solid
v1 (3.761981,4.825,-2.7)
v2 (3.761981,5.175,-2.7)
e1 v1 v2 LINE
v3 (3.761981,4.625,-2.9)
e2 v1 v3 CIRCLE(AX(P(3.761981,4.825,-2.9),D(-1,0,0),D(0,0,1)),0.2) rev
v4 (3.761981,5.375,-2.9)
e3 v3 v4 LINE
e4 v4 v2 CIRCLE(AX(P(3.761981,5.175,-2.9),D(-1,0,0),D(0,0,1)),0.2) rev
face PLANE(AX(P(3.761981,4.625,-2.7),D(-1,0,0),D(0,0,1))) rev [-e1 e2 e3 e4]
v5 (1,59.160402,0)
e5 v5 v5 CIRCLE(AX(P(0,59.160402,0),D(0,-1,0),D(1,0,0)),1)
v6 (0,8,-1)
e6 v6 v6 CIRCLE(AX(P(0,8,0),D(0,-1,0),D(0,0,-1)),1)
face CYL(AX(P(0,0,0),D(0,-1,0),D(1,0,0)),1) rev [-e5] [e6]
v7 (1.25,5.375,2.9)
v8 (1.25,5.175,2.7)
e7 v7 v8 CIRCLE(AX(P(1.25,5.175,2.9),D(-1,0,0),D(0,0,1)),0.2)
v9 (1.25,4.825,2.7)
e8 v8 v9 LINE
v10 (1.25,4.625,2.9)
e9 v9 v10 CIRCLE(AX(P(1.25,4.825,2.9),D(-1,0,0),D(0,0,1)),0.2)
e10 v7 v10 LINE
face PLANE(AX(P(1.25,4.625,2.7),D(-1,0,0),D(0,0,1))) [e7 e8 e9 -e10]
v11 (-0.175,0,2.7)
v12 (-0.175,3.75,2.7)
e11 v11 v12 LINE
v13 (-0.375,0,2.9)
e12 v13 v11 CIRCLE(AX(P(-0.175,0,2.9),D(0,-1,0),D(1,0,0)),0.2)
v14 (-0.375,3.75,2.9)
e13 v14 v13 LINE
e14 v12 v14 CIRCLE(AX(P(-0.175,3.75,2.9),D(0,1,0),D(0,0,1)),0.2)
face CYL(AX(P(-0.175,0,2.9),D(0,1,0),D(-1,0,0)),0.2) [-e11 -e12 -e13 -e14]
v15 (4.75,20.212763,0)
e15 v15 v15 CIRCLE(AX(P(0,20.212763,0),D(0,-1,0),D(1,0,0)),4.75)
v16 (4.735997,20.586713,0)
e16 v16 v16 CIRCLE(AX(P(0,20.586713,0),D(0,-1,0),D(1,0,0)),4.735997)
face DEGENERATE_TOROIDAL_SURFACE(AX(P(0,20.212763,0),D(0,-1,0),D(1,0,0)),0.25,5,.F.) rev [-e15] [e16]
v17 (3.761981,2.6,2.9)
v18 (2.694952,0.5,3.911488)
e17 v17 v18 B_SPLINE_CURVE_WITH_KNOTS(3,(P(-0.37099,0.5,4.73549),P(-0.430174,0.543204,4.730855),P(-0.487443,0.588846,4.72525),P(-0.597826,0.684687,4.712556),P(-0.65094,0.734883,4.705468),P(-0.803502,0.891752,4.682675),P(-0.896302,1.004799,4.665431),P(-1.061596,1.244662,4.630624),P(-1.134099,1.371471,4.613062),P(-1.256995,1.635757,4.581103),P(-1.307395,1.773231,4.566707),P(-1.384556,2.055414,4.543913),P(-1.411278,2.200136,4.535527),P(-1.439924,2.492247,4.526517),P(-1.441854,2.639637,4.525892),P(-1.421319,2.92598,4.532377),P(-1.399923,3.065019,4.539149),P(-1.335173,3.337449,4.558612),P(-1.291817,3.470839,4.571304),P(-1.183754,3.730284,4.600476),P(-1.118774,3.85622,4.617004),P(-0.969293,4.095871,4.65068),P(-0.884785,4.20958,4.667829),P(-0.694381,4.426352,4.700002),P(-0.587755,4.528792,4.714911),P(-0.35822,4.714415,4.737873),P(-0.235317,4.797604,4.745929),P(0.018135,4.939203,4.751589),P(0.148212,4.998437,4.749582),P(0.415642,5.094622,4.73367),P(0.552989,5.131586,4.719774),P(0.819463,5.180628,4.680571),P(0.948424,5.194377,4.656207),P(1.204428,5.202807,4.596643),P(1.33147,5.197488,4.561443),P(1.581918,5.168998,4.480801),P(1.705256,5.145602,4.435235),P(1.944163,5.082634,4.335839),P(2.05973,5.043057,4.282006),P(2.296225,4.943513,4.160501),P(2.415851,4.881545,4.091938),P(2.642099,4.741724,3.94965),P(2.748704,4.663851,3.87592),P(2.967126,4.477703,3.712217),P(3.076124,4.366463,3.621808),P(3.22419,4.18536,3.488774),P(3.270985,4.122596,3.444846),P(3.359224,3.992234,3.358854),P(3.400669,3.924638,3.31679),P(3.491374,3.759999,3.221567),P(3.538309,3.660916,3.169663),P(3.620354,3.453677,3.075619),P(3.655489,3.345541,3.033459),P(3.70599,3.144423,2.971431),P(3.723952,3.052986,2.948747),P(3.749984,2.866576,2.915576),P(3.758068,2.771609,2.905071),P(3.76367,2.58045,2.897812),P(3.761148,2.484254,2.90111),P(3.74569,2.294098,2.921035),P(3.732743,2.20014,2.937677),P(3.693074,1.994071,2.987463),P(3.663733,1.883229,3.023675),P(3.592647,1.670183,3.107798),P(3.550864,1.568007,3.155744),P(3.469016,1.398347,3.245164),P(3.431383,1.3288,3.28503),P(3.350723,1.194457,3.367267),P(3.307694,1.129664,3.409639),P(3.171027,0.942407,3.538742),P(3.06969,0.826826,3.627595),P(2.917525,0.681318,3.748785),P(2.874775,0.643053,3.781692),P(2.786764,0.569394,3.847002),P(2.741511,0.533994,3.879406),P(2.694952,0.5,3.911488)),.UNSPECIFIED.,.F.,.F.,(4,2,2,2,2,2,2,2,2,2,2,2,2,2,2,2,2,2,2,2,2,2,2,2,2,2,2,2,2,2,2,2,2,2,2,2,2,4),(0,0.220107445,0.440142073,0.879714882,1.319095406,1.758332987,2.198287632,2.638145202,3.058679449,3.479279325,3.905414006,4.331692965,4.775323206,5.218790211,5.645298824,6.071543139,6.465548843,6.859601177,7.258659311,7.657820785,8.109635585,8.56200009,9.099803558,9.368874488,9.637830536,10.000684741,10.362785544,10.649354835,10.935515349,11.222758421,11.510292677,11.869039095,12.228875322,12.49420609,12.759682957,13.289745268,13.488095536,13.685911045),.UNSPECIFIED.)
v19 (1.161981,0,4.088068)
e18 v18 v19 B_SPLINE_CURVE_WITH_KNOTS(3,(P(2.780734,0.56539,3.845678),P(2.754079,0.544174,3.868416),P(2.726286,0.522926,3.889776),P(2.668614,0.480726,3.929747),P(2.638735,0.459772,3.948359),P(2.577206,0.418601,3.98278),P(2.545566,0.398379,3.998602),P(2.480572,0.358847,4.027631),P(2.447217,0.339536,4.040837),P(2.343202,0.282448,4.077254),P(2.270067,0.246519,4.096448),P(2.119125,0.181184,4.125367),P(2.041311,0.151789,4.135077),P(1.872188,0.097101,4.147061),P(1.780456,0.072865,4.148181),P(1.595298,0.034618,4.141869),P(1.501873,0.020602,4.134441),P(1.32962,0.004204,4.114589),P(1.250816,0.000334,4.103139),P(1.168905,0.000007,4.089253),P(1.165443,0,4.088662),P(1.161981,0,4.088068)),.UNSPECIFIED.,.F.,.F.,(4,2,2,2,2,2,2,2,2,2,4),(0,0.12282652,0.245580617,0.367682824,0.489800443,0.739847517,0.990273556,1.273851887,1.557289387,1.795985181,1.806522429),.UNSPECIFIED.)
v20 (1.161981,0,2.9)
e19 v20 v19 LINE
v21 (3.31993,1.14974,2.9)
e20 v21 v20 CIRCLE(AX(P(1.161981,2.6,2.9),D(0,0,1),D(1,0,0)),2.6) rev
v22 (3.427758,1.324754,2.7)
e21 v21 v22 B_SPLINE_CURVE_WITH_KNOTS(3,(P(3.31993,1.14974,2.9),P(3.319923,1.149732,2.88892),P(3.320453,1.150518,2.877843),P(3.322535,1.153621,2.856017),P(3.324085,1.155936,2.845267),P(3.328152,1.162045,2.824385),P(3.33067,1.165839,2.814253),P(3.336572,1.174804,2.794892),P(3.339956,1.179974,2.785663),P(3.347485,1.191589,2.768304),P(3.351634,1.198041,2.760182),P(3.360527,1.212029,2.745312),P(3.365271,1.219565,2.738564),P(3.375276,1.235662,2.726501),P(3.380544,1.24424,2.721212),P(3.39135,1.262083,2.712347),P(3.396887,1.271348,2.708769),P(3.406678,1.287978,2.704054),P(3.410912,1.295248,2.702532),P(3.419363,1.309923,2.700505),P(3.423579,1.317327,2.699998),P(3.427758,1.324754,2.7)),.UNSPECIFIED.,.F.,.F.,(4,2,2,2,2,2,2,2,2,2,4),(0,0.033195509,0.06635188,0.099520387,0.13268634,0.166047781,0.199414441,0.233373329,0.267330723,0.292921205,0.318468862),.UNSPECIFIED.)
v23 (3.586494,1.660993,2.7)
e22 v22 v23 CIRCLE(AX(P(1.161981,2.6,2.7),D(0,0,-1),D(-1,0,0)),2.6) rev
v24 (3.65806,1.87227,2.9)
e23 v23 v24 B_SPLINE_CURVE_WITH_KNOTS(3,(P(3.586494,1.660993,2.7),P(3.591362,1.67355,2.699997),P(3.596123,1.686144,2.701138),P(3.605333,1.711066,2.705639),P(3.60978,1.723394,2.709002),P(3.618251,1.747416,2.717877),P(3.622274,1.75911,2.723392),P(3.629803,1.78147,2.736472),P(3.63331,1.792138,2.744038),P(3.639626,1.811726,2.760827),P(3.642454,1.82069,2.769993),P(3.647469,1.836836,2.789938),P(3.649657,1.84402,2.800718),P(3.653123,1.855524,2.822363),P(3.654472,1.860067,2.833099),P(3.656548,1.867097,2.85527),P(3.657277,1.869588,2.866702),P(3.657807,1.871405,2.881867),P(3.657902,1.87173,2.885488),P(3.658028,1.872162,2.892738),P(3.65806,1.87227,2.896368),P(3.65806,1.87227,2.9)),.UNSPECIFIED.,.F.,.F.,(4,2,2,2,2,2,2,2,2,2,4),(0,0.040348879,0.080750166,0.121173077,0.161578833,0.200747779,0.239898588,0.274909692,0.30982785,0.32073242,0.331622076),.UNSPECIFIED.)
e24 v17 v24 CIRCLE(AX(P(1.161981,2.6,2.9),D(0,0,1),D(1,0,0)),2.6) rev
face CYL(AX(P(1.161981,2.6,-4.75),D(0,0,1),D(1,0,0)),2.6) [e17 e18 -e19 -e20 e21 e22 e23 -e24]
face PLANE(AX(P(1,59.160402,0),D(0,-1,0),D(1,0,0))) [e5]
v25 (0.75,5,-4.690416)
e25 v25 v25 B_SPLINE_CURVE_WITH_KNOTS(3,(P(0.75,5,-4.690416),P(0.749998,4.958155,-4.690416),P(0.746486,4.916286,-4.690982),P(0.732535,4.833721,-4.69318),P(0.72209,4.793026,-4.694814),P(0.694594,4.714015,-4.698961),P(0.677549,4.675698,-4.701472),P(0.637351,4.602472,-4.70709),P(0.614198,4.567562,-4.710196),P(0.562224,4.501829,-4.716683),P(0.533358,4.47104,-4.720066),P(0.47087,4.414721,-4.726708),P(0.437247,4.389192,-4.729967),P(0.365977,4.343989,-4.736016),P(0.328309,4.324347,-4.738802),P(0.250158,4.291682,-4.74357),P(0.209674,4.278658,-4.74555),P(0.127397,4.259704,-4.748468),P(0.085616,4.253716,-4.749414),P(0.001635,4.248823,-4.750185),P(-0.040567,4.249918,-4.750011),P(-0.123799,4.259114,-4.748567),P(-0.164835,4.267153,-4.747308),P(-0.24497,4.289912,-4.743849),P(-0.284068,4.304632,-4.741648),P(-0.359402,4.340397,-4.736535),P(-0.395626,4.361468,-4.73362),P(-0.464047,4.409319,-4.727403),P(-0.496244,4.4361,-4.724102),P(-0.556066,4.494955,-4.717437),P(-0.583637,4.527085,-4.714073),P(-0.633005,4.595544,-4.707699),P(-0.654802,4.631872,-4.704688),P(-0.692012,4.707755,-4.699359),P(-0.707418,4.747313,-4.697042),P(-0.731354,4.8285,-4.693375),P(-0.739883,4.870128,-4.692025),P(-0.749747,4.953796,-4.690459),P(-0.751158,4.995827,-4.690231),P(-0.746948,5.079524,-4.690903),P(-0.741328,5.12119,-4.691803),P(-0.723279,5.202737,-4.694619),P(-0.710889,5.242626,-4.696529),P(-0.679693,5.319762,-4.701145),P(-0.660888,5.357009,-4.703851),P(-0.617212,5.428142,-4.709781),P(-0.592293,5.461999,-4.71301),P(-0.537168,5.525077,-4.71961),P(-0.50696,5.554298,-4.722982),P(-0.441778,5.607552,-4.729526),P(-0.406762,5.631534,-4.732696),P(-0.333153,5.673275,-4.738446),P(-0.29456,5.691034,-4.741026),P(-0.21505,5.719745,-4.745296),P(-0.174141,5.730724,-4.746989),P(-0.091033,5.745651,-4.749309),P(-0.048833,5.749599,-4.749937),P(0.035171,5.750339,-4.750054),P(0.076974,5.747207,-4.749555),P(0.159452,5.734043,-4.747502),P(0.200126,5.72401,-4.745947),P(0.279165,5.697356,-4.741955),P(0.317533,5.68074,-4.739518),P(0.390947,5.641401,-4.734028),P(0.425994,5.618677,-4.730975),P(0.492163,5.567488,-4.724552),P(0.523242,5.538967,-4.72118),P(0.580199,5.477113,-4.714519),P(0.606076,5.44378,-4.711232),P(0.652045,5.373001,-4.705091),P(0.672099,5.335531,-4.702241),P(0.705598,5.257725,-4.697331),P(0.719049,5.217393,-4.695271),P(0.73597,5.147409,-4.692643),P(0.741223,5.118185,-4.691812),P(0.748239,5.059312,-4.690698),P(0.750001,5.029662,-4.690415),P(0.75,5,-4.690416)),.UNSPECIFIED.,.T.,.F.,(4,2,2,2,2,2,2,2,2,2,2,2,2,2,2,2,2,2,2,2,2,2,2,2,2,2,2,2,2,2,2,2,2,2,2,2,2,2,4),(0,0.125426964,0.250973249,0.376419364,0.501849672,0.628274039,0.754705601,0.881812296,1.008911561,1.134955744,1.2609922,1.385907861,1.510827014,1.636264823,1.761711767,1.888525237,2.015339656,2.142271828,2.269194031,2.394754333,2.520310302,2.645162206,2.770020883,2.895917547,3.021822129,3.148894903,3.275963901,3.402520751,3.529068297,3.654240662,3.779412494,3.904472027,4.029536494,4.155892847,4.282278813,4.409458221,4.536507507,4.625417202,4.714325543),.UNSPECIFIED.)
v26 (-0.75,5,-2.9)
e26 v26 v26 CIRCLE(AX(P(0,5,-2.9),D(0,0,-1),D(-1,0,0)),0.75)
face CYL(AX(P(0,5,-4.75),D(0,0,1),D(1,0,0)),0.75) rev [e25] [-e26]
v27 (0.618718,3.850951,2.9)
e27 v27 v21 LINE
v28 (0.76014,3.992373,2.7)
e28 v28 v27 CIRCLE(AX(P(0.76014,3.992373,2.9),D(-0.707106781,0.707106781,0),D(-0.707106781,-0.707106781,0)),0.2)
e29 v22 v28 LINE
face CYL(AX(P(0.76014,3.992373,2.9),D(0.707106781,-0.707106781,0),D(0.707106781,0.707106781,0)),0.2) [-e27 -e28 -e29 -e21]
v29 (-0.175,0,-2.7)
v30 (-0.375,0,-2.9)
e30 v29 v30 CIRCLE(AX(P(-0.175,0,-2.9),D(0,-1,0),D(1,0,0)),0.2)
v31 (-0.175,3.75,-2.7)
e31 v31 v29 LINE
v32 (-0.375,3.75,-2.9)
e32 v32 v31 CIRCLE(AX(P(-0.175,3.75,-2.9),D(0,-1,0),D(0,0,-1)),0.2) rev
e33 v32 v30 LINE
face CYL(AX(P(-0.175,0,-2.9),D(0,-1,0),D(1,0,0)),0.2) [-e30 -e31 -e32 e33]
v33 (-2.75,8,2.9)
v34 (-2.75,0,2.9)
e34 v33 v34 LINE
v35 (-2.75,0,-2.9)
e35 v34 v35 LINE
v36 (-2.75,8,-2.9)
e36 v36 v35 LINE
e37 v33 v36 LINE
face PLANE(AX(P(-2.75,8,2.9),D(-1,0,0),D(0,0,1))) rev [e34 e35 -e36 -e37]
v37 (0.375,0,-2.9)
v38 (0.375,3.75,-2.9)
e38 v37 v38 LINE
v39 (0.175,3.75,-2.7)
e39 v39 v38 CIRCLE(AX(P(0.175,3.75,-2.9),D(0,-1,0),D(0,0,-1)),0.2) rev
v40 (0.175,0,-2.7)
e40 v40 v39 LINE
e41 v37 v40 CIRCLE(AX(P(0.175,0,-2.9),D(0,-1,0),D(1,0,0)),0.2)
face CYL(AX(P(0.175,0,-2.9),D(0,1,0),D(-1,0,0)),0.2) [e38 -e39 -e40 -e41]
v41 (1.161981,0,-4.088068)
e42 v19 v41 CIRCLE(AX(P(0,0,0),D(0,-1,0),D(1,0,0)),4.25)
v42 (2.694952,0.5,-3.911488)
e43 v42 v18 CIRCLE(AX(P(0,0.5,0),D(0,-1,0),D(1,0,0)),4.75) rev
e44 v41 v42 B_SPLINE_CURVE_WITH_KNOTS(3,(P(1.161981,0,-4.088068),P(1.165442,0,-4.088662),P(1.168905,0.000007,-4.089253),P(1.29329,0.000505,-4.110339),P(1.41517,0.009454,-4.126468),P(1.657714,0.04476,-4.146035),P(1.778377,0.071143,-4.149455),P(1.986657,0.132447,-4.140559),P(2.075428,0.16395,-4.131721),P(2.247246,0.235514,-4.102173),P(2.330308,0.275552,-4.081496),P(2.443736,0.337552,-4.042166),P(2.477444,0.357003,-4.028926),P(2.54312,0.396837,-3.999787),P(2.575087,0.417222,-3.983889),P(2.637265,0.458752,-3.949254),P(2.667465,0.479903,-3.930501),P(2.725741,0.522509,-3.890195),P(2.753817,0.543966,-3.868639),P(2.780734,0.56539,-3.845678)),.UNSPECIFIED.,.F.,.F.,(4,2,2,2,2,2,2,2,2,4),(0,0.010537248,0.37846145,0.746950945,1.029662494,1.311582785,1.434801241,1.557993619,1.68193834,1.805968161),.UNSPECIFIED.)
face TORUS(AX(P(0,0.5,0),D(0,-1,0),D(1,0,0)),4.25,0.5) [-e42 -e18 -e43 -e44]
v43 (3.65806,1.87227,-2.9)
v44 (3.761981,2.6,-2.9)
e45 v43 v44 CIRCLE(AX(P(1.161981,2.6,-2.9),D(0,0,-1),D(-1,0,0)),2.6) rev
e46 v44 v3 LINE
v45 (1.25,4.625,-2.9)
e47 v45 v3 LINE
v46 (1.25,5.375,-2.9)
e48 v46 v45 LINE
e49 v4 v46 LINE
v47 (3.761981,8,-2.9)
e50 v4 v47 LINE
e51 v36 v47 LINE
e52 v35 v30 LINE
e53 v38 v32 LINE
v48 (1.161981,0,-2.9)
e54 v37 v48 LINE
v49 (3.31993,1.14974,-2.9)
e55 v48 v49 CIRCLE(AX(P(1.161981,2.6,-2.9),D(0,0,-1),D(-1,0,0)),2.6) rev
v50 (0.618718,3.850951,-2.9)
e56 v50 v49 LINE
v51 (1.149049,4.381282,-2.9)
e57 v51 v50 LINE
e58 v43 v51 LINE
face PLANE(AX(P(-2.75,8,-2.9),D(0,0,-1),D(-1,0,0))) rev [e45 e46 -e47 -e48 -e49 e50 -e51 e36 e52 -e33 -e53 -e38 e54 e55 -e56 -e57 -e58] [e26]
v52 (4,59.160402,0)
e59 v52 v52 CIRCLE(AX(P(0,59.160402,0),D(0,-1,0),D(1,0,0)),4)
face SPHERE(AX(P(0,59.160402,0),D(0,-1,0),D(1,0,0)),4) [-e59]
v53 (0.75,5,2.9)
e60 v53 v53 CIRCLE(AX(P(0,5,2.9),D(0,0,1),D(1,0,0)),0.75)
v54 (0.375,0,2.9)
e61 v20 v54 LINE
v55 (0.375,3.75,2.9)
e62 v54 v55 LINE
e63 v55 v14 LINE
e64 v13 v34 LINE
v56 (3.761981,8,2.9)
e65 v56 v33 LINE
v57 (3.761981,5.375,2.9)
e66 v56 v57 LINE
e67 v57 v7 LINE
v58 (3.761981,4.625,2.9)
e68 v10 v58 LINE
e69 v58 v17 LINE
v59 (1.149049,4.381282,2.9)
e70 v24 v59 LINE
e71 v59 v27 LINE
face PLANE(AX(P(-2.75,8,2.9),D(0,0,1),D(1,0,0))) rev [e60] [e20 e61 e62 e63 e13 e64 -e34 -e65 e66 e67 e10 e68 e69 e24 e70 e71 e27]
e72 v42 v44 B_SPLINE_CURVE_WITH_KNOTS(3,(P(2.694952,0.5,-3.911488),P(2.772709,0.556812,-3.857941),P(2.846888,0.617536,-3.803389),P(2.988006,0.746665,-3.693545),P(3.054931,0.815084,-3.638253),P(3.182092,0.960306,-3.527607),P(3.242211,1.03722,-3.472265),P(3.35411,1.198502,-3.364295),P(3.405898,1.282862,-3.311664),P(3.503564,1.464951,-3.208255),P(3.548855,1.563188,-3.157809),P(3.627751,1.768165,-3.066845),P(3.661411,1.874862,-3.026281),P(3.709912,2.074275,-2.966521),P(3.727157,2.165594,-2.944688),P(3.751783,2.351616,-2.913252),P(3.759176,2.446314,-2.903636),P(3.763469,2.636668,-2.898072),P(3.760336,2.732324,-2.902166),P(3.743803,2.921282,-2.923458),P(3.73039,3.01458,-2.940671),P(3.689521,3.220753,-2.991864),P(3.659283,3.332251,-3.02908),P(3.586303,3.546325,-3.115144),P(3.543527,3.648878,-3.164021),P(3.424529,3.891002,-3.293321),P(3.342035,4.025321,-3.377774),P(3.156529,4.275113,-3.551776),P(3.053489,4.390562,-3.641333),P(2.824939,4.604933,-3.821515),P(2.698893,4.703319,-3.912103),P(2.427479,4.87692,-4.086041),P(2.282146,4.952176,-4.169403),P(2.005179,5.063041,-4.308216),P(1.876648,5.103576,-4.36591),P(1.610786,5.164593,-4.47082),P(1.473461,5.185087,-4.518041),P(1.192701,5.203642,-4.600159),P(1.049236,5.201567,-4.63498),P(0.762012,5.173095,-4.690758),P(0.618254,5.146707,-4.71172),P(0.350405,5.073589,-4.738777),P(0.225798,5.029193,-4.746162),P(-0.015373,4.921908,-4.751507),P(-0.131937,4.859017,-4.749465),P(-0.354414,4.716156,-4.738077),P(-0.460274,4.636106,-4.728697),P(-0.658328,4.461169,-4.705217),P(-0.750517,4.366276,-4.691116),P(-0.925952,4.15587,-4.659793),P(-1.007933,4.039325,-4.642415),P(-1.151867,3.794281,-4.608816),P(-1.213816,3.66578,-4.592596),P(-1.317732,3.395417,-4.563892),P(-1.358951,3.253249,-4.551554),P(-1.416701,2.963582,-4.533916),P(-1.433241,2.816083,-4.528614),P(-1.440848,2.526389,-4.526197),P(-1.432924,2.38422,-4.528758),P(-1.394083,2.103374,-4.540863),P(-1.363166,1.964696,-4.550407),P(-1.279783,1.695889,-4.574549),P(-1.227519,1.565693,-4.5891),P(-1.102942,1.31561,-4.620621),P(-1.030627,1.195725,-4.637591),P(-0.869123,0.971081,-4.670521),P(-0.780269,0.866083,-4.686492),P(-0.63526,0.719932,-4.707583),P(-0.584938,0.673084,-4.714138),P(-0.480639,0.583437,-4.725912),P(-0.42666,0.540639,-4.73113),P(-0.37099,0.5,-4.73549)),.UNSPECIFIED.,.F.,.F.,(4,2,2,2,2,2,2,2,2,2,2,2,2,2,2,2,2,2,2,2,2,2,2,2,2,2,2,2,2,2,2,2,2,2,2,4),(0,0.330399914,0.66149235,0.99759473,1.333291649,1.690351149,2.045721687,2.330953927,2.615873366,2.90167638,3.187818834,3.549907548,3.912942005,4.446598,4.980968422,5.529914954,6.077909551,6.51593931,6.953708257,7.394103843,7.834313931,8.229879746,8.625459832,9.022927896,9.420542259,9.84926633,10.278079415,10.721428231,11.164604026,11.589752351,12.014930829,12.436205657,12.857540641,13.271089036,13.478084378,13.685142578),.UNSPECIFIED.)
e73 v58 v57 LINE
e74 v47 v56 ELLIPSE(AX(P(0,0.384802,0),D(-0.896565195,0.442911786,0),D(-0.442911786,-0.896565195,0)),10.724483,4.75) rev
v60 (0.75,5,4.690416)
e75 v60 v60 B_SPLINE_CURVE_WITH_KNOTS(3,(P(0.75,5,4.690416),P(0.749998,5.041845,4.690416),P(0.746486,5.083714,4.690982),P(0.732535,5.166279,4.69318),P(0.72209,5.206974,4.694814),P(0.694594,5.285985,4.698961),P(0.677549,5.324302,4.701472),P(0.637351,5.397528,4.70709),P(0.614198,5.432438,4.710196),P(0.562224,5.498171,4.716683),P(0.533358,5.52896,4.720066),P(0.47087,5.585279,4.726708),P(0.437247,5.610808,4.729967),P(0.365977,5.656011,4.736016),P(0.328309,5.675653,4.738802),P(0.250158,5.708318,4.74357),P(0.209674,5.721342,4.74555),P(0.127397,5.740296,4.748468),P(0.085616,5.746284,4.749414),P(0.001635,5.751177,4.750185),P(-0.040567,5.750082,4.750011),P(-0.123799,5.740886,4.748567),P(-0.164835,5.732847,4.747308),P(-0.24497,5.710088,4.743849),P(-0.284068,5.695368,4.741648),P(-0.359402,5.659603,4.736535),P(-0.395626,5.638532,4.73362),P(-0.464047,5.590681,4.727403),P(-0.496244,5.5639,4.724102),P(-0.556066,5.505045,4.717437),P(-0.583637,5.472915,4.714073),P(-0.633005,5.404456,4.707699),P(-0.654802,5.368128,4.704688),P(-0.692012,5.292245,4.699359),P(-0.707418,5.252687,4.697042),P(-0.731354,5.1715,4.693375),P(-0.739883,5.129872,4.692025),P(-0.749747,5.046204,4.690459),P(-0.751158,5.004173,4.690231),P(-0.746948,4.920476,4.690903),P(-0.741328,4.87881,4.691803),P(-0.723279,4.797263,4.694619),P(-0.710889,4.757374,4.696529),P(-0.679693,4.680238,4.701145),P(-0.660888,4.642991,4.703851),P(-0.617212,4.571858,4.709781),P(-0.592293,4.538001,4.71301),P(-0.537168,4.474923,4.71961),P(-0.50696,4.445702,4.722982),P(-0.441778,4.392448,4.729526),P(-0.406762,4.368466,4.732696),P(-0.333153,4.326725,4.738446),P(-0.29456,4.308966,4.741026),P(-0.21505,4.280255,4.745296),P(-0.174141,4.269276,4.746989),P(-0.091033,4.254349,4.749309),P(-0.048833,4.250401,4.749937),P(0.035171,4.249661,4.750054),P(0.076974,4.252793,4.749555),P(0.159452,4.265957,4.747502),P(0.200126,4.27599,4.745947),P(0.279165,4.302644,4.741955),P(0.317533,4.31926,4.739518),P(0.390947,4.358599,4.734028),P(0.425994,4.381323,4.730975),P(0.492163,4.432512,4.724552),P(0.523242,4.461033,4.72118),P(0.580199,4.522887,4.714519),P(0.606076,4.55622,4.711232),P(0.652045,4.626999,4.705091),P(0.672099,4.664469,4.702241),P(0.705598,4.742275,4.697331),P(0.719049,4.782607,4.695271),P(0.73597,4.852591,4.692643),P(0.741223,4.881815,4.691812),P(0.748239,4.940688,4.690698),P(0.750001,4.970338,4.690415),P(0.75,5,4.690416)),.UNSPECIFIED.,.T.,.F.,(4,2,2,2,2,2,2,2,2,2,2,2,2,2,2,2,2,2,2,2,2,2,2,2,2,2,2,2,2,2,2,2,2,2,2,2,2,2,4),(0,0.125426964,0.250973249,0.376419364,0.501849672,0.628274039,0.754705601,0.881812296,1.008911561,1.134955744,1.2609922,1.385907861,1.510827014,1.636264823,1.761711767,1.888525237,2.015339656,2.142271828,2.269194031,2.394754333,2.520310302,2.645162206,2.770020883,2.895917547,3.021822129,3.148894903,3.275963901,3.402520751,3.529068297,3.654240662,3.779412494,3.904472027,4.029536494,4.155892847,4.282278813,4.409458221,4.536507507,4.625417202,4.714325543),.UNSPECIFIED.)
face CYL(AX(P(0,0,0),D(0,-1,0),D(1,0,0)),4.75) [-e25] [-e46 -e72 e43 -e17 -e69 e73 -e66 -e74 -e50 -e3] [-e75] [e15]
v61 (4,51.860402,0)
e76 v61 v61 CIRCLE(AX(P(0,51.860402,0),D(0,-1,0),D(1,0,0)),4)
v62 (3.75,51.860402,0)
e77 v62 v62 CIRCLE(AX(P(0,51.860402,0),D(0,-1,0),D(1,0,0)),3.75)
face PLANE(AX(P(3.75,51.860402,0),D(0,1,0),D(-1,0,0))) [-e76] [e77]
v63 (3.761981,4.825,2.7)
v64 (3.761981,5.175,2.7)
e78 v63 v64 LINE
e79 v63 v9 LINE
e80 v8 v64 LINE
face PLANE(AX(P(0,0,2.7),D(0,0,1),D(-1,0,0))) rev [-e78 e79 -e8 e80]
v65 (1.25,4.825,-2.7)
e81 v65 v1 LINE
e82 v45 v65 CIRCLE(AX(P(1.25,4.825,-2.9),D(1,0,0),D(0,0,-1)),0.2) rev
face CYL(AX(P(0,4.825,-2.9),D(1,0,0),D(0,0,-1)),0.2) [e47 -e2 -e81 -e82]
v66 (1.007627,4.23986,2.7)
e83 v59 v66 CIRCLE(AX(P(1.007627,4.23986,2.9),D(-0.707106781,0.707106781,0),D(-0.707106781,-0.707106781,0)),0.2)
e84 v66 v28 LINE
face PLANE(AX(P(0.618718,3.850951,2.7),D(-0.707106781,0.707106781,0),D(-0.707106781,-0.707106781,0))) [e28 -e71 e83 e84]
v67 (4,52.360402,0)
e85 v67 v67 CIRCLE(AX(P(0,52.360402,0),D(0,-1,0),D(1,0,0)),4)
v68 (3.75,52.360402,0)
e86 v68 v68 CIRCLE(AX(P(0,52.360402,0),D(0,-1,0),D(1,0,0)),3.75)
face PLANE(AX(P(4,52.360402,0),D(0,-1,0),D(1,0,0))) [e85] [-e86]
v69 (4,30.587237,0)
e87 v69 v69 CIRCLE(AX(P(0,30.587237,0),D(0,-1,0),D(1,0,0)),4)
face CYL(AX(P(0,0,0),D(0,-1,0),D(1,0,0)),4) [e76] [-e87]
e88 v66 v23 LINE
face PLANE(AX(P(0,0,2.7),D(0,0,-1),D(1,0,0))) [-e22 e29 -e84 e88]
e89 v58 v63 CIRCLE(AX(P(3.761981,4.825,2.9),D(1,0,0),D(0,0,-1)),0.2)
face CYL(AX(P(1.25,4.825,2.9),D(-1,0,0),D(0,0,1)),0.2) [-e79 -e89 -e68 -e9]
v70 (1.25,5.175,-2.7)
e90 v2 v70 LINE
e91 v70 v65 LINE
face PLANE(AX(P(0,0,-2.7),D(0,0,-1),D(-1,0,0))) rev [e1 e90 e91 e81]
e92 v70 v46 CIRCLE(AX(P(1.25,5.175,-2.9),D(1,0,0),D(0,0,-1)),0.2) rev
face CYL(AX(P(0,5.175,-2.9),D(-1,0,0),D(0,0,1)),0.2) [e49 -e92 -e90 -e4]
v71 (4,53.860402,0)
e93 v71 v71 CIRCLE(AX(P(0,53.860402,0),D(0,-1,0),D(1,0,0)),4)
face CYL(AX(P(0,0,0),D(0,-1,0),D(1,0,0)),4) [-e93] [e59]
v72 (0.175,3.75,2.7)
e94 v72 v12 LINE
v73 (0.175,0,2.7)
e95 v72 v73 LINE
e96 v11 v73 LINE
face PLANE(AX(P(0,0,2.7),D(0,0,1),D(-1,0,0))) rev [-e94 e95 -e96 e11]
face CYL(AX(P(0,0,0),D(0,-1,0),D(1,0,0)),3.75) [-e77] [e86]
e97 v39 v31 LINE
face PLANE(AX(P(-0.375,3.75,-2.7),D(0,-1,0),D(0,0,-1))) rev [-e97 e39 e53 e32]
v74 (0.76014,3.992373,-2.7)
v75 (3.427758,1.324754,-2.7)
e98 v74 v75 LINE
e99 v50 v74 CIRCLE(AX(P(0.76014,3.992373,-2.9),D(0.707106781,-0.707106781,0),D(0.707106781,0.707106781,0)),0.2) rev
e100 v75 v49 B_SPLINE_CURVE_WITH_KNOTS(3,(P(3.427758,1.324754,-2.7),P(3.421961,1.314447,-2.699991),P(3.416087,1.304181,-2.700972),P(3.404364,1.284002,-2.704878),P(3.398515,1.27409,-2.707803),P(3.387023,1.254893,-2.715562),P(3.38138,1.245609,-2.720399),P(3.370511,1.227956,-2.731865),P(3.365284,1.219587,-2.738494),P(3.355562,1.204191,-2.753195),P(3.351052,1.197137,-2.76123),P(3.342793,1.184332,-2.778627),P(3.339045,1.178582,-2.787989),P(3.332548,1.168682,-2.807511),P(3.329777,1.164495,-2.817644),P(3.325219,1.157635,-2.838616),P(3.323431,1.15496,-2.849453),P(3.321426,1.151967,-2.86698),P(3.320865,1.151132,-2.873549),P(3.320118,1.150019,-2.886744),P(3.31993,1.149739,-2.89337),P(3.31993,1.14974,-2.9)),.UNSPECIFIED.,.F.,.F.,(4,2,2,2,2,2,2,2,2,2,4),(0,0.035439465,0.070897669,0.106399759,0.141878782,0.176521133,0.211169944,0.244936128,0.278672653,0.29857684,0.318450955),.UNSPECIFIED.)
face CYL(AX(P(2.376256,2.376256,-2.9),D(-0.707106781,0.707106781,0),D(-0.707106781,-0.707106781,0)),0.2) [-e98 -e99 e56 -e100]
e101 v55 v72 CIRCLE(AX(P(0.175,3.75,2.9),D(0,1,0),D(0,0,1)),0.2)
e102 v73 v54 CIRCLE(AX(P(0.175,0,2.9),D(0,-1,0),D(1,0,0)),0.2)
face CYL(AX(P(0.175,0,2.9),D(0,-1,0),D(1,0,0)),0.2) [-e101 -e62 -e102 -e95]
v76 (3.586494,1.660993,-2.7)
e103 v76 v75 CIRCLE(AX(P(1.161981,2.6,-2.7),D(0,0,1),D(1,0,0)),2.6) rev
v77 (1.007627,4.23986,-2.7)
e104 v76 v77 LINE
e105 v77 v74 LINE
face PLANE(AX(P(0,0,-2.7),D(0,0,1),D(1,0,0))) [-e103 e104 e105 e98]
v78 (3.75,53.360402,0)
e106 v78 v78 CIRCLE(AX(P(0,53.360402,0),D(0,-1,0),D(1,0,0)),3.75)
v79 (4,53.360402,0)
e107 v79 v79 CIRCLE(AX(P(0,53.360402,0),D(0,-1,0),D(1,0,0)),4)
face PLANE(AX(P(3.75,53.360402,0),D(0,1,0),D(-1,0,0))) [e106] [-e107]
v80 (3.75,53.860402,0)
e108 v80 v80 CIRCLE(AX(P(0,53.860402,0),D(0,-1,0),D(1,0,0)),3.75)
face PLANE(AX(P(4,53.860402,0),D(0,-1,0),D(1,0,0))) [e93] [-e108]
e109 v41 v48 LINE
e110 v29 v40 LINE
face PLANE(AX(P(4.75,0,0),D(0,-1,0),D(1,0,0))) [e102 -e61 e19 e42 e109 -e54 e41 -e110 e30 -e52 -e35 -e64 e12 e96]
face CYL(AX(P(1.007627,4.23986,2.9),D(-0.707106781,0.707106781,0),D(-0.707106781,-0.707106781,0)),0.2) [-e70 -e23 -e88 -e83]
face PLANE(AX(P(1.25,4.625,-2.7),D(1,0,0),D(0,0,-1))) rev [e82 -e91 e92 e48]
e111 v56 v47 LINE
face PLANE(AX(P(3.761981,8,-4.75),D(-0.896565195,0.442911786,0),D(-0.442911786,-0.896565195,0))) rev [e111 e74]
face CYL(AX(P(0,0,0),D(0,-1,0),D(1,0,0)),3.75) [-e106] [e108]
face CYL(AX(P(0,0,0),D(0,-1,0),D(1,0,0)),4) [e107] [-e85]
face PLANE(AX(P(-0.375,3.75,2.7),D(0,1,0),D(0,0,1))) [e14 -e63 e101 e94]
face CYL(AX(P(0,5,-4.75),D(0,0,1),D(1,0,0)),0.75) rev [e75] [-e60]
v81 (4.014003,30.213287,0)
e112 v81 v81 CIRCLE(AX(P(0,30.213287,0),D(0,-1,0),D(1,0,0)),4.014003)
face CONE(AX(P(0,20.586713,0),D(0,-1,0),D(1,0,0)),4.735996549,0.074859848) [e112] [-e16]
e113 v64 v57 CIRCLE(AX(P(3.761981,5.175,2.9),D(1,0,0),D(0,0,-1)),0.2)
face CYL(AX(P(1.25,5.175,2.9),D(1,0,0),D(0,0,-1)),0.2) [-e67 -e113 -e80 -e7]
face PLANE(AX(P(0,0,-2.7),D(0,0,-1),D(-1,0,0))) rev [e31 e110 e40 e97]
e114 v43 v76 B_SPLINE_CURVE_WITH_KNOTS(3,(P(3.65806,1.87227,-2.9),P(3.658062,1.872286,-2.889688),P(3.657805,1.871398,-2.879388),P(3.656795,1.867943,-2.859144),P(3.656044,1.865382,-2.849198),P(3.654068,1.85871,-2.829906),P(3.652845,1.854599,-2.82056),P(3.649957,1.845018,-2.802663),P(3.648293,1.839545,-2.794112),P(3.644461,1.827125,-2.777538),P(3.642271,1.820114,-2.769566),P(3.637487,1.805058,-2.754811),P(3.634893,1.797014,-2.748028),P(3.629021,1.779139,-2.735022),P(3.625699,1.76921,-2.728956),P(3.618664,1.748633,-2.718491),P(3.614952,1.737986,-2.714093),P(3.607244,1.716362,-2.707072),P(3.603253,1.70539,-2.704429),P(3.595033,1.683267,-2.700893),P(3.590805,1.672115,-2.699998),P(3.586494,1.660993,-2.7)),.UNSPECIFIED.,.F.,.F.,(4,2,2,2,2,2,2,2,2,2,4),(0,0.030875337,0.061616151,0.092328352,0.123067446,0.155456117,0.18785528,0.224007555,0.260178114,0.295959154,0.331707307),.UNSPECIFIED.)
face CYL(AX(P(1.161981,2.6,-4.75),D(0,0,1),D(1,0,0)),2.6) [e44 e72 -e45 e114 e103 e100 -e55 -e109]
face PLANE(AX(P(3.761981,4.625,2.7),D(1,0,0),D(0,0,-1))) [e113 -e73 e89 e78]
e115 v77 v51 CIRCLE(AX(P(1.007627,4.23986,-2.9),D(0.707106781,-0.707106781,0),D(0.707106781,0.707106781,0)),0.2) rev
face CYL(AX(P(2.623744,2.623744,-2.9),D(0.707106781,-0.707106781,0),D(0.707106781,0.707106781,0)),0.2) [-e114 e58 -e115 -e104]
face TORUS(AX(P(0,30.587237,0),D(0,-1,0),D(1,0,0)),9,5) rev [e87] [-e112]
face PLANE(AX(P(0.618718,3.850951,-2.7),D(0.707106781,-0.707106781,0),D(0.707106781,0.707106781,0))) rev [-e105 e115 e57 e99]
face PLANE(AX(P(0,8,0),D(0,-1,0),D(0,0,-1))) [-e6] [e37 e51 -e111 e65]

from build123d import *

# Parameters (mm, degrees)
ESQUISSE3_W                  = 7.5
ESQUISSE3_H                  = 5.8
ENL_V_MAT_EXTRU_1_DEPTH      = 8
CONG_1_R                     = 0.5
ENL_V_MAT_EXTRU_2_DEPTH      = 64.516622885
ENL_V_MAT_EXTRU_2_DEPTH_BACK = 64.516622885
ESQUISSE4_R                  = 0.75
ESQUISSE5_W                  = 0.75
ESQUISSE5_H                  = 3.75
ESQUISSE5_W_2                = 2.511980861
ESQUISSE5_H_2                = 0.75
BOSS_EXTRU_1_DEPTH           = 0.2
CONG_2_R                     = 0.2
CONG_2_OF_SYM_TRIE1_R        = 0.2
ENL_V_MAT_EXTRU_3_DEPTH      = 64.799070395


with BuildPart() as part:
    # Esquisse2 → Révolution1 (revolve)
    with BuildSketch(Plane.XY):
        with BuildLine():
            Line((4.014003451, 30.213287326), (4.735996549, 20.586712674))
            ThreePointArc((4.735996549, 20.586712674), (4.746497911, 20.399868856), (4.75, 20.212762933))
            Line((4.75, 20.212762933), (4.75, 0))
            Line((4.75, 0), (1, 0))
            Line((1, 0), (1, 59.160402))
            Line((1, 59.160402), (0, 59.160402))
            Line((0, 59.160402), (0, 63.160402))
            ThreePointArc((0, 63.160402), (2.828427125, 61.988829125), (4, 59.160402))
            Line((4, 59.160402), (4, 53.860402))
            Line((4, 53.860402), (3.75, 53.860402))
            Line((3.75, 53.860402), (3.75, 53.360402))
            Line((3.75, 53.360402), (4, 53.360402))
            Line((4, 53.360402), (4, 52.360402))
            Line((4, 52.360402), (3.75, 52.360402))
            Line((3.75, 52.360402), (3.75, 51.860402))
            Line((3.75, 51.860402), (4, 51.860402))
            Line((4, 51.860402), (4, 30.587237067))
            ThreePointArc((4, 30.587237067), (4.003502089, 30.400131144), (4.014003451, 30.213287326))
        make_face()
    revolve(axis=Axis((0, 0, 0), (0, 1, 0)))

    # Esquisse3 → Enlèv. mat.-Extru.1 (cut)
    with BuildSketch(Plane.XZ):
        with Locations((1, 0)):
            Rectangle(ESQUISSE3_W, ESQUISSE3_H)
    extrude(amount=-ENL_V_MAT_EXTRU_1_DEPTH, mode=Mode.SUBTRACT)

    # Congé1
    cong_1_edges = [part.edges().sort_by_distance(p)[0] for p in [
        (-4.75, 0, 0),
    ]]
    fillet(cong_1_edges, radius=CONG_1_R)

    # Esquisse4 → Enlèv. mat.-Extru.2 (cut, two sides: drawn at the far end of the back side and taken through both)
    with BuildSketch(Plane.XY.offset(-ENL_V_MAT_EXTRU_2_DEPTH_BACK)):
        with Locations((0, 5)):
            Circle(ESQUISSE4_R)
        with BuildLine():
            Line((1.161980861, 0), (3.761980861, 0))
            Line((3.761980861, 0), (3.761980861, 2.6))
            ThreePointArc((3.761980861, 2.6), (3.000458492, 0.761522369), (1.161980861, 0))
        make_face()
        Polygon((3.761980861, 8), (4.75, 10), (4.75, 8), align=None)
    extrude(amount=ENL_V_MAT_EXTRU_2_DEPTH + ENL_V_MAT_EXTRU_2_DEPTH_BACK, mode=Mode.SUBTRACT)

    # Esquisse5 → Boss.-Extru.1 (add)
    with BuildSketch(Plane.XY.offset(-2.9)):
        with Locations((0, 1.875)):
            Rectangle(ESQUISSE5_W, ESQUISSE5_H)
        Polygon((0.618718434, 3.850951481), (1.149048519, 4.381281566), (4.027145904, 1.503184182), (3.496815818, 0.972854096), align=None)
        with Locations((2.50599043, 5)):
            Rectangle(ESQUISSE5_W_2, ESQUISSE5_H_2)
    boss_extru_1 = extrude(amount=BOSS_EXTRU_1_DEPTH)

    # Congé2
    cong_2_edges = [part.edges().sort_by_distance(p)[0] for p in [
        (2.505990431, 5.375, -2.7),
        (2.505990431, 4.625, -2.7),
        (2.588097212, 2.942232874, -2.7),
        (2.057767126, 2.411902788, -2.7),
        (-0.375, 1.875, -2.7),
        (0.375, 1.875, -2.7),
    ]]
    fillet(cong_2_edges, radius=CONG_2_R - 0.0001)  # a hair under: the kernel refuses the full size

    # Symétrie1: Boss.-Extru.1 across plane
    add(boss_extru_1.mirror(Plane.XY))

    # Congé2 of Symétrie1
    cong_2_of_sym_trie1_edges = [part.edges().sort_by_distance(p)[0] for p in [
        (2.505990431, 5.375, 2.7),
        (2.505990431, 4.625, 2.7),
        (2.588097212, 2.942232874, 2.7),
        (2.057767126, 2.411902788, 2.7),
        (-0.375, 1.875, 2.7),
        (0.375, 1.875, 2.7),
    ]]
    fillet(cong_2_of_sym_trie1_edges, radius=CONG_2_OF_SYM_TRIE1_R - 0.0001)  # a hair under: the kernel refuses the full size

    # Esquisse6 → Enlèv. mat.-Extru.3 (cut, through all)
    with BuildSketch(Plane.XY.offset(2.9)):
        with BuildLine():
            Line((4.027145904, 1.503184182), (3.658059706, 1.87227038))
            ThreePointArc((3.658059706, 1.87227038), (3.516870908, 1.49795968), (3.319930166, 1.149739748))
            Line((3.319930166, 1.149739748), (3.496815818, 0.972854096))
            Line((3.496815818, 0.972854096), (4.027145904, 1.503184182))
        make_face()
    extrude(amount=-ENL_V_MAT_EXTRU_3_DEPTH, mode=Mode.SUBTRACT)


solid = part.part
